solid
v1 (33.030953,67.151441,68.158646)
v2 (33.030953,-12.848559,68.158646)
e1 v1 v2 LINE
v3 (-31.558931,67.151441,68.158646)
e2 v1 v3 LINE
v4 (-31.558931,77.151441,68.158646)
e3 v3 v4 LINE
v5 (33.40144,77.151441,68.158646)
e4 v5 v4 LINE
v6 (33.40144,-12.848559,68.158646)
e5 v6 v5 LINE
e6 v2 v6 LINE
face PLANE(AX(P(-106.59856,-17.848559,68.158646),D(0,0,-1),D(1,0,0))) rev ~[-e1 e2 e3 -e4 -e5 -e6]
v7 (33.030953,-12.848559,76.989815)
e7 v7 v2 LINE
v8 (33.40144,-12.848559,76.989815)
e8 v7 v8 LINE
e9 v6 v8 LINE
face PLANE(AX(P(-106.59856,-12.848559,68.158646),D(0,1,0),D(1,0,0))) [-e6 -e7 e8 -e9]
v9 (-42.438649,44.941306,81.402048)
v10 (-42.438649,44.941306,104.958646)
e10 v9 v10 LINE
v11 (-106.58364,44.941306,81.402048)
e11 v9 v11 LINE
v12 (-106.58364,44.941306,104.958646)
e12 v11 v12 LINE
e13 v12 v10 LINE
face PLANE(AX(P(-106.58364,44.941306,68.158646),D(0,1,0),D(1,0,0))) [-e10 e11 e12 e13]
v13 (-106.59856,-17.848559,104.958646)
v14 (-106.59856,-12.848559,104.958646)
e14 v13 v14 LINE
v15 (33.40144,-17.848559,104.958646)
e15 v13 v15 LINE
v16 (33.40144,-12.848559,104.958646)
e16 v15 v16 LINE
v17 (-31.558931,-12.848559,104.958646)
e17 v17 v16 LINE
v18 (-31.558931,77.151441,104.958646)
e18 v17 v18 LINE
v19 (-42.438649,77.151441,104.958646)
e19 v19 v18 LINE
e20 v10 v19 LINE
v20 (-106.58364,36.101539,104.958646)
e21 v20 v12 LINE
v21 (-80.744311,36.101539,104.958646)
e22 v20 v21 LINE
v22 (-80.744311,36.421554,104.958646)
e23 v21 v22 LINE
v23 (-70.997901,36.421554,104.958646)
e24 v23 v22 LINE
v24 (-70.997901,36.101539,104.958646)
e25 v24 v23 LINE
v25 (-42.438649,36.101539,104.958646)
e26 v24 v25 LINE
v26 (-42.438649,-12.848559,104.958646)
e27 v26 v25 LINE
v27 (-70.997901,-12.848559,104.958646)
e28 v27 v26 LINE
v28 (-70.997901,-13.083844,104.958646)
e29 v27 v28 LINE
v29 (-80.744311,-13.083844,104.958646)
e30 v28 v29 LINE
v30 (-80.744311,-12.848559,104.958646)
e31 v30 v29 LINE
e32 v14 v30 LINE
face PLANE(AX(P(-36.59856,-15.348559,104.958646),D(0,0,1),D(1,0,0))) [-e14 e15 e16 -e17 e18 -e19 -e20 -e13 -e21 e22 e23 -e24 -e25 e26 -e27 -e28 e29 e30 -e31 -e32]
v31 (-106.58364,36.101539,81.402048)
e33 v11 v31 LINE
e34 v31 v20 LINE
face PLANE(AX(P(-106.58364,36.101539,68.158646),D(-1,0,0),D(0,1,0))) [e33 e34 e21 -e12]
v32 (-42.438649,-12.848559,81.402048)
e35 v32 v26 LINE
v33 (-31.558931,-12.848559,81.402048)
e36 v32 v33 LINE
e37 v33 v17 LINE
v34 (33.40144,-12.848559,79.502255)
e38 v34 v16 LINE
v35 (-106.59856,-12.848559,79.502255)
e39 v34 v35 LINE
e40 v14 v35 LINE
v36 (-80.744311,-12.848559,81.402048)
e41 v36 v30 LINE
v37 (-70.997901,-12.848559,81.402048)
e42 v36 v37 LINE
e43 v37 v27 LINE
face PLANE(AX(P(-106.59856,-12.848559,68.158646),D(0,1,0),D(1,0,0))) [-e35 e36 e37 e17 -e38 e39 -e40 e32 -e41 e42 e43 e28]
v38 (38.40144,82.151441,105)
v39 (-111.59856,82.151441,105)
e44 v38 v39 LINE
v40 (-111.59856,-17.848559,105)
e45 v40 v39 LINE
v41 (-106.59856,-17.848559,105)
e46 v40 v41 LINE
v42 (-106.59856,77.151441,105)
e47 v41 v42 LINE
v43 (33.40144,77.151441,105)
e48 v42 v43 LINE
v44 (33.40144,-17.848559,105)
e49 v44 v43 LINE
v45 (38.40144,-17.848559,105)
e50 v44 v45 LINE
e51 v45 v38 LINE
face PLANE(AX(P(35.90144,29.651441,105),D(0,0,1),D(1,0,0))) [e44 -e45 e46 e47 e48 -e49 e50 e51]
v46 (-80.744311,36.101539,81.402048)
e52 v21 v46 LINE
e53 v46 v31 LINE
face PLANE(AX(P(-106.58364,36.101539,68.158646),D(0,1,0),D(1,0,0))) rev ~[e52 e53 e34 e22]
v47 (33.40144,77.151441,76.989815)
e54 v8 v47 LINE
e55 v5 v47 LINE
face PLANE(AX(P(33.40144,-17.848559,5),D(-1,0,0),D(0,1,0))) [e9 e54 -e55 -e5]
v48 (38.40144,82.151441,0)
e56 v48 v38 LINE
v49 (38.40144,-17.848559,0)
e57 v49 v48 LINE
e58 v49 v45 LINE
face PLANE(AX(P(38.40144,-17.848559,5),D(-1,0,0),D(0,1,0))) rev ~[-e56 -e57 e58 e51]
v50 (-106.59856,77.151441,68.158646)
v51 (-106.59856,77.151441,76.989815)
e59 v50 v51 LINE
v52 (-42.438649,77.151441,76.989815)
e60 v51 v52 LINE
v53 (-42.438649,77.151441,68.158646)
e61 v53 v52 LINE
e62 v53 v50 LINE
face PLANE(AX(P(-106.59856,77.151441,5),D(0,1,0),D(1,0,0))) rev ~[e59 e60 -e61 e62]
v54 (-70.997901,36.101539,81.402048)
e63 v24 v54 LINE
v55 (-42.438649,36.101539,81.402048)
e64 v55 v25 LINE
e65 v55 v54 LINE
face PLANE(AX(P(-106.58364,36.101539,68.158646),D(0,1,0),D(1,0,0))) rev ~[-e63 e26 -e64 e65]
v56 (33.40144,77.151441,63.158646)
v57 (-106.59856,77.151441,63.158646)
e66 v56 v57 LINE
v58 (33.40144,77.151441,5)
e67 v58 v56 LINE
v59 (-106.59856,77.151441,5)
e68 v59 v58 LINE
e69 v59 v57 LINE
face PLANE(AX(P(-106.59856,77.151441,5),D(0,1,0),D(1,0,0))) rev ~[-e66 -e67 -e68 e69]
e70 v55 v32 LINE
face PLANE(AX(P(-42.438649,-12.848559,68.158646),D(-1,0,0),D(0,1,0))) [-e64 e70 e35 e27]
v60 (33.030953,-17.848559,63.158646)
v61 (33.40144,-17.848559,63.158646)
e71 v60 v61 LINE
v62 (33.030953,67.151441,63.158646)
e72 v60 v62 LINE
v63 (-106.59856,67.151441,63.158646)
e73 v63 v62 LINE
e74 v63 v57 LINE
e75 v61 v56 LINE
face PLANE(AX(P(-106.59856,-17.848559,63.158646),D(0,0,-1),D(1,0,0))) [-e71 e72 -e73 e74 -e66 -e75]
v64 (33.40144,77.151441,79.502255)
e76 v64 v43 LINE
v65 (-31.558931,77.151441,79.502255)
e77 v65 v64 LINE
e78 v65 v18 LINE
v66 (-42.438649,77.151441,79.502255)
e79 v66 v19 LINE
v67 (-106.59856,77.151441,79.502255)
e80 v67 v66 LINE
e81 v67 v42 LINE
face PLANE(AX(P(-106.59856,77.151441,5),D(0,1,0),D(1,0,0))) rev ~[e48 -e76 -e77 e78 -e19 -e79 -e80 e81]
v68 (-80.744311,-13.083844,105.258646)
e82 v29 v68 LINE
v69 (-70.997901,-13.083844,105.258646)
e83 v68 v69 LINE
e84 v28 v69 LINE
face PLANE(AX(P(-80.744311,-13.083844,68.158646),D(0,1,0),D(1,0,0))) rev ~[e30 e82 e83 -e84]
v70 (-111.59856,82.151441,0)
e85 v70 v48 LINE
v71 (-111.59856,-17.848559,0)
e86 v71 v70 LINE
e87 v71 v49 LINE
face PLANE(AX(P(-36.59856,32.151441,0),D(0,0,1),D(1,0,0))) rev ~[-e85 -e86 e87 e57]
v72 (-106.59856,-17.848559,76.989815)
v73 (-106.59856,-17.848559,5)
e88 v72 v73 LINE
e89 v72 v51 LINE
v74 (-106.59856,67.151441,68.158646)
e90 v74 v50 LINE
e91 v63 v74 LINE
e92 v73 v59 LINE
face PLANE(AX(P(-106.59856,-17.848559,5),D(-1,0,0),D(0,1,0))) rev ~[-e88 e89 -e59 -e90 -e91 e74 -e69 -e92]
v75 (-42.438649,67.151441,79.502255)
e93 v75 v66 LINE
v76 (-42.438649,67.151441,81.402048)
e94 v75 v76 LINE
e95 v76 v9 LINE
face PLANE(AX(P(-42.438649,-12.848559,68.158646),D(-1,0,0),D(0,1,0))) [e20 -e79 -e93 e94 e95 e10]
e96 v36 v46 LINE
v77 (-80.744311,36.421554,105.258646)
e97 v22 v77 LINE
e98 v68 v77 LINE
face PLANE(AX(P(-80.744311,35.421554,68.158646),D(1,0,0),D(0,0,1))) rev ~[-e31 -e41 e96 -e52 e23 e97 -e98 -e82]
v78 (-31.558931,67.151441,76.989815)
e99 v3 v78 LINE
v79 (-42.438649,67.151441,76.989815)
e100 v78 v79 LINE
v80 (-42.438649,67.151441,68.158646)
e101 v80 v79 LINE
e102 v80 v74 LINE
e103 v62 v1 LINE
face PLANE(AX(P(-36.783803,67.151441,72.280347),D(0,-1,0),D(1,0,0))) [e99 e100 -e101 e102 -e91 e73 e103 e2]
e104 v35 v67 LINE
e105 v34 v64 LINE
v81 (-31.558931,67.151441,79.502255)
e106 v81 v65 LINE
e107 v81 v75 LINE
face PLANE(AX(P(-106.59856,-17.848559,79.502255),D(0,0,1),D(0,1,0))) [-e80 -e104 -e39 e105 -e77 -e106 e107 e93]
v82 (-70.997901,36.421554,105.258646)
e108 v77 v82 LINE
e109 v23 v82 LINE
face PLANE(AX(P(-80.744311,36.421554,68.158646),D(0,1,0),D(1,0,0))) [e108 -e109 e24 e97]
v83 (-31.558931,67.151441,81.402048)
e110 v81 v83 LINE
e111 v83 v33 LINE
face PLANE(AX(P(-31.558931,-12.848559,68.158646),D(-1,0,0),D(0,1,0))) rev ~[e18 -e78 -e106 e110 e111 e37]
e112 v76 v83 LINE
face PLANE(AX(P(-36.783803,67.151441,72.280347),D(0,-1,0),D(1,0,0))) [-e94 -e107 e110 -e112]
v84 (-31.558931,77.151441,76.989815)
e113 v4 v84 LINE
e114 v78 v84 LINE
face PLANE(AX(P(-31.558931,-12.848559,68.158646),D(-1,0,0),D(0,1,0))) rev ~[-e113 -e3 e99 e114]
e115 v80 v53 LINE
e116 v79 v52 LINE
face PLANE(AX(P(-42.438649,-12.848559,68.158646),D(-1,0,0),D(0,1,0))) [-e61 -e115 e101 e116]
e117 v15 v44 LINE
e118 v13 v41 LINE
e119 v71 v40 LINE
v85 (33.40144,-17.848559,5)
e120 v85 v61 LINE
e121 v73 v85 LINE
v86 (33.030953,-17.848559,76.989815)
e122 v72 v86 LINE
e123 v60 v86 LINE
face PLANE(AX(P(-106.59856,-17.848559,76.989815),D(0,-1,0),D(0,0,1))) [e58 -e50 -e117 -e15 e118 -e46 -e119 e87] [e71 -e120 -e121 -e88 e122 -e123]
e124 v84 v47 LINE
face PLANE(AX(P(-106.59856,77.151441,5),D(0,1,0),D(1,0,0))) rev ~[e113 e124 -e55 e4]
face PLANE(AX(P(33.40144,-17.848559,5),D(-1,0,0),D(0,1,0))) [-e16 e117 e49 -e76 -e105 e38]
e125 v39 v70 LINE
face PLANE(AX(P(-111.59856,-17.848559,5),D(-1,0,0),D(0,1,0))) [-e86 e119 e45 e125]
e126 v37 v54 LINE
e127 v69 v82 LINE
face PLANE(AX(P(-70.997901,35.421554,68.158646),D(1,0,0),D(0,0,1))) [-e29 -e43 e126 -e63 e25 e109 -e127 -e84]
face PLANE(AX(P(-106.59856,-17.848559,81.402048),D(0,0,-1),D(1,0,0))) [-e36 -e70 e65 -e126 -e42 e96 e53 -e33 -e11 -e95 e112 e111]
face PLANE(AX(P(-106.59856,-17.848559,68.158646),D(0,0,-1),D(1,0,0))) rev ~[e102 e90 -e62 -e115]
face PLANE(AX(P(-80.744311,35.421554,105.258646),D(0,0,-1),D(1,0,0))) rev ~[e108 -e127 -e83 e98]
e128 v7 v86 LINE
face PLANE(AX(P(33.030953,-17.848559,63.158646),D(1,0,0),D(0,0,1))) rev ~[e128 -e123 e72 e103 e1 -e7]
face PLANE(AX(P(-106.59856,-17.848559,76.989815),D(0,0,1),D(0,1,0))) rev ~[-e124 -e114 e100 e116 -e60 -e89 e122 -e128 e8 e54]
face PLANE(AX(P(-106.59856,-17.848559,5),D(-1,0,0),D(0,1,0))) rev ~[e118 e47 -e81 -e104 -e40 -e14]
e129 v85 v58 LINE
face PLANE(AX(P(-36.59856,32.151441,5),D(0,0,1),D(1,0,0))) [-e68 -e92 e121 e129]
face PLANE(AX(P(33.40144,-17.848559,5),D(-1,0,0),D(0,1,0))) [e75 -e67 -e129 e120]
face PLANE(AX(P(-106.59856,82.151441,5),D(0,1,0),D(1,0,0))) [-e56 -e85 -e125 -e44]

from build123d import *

# Parameters (mm, degrees)
F0_W      = 150
F0_H      = 100
F1_DEPTH  = 5
F2_W      = 5
F2_H      = 100
F3_DEPTH  = 100
F4_W      = 145
F4_H      = 5
F5_DEPTH  = 100
F6_W      = 5
F6_H      = 95
F7_DEPTH  = 100
F8_W      = 140
F8_H      = 5
F9_DEPTH  = 100
F10_W     = 140
F10_H     = 5
F11_DEPTH = 36.8
F12_W     = 10.8797177672
F12_H     = 90
F13_DEPTH = 36.8
F15_W     = 64.1449913383
F15_H     = 8.8397674263
F16_DEPTH = 36.8
F17_W     = 9.7464099526
F17_H     = 48.5053984448
F18_DEPTH = 37.1
F19_DEPTH = 1
F20_W     = 139.6295134723
F20_H     = 18.2434022427
F21_DEPTH = 85
F22_W     = 95
F22_H     = 2.5124400854
F23_DEPTH = 142.2
F25_DEPTH = 3


with BuildPart() as f1:
    # F0 (on Top) → F1 (new body)
    with BuildSketch(Plane.XY):
        with Locations((-36.598560214, 32.1514412761)):
            Rectangle(F0_W, F0_H)
    extrude(amount=F1_DEPTH)

    # F2 (on face) → F3 (join)
    with BuildSketch(Plane.XY.offset(5)):
        with Locations((-109.098560214, 32.1514412761)):
            Rectangle(F2_W, F2_H)
    extrude(amount=F3_DEPTH)

    # F4 (on face) → F5 (join)
    with BuildSketch(Plane.XY.offset(5)):
        with Locations((-34.098560214, 79.6514412761)):
            Rectangle(F4_W, F4_H)
    extrude(amount=F5_DEPTH)

    # F6 (on face) → F7 (join)
    with BuildSketch(Plane.XY.offset(5)):
        with Locations((35.901439786, 29.6514412761)):
            Rectangle(F6_W, F6_H)
    extrude(amount=F7_DEPTH)

    # F8 (on face) → F9 (join)
    with BuildSketch(Plane.XZ.offset(17.8485587239)):
        with Locations((-36.598560214, 65.6586462259)):
            Rectangle(F8_W, F8_H)
    extrude(amount=-F9_DEPTH)

    # F10 (on face) → F11 (join)
    with BuildSketch(Plane.XY.offset(68.1586462259)):
        with Locations((-36.598560214, -15.3485587239)):
            Rectangle(F10_W, F10_H)
    extrude(amount=F11_DEPTH)

    # F12 (on face) → F13 (join)
    with BuildSketch(Plane.XY.offset(68.1586462259)):
        with Locations((-36.9987897575, 32.1514412761)):
            Rectangle(F12_W, F12_H)
    extrude(amount=F13_DEPTH)

    # F15 (on face) → F16 (join)
    with BuildSketch(Plane.XY.offset(68.1586462259)):
        with Locations((-74.5111443102, 40.5214224011)):
            Rectangle(F15_W, F15_H)
    extrude(amount=F16_DEPTH)

    # F17 (on face) → F18 (join)
    with BuildSketch(Plane.XY.offset(68.1586462259)):
        with Locations((-75.8711062372, 11.1688547768)):
            Rectangle(F17_W, F17_H)
    extrude(amount=F18_DEPTH)

    # F19 (add): a face of the model
    f19_faces = [f1.faces().sort_by_distance(p)[0] for p in [
        (-75.8711062372, 35.4215539992, 86.7086462259),
    ]]
    extrude(f19_faces, amount=F19_DEPTH)

    # F20 (on face) → F21 (cut)
    with BuildSketch(Plane.XZ.offset(17.8485587239)):
        with Locations((-36.7838034779, 72.2803473473)):
            Rectangle(F20_W, F20_H)
    extrude(amount=-F21_DEPTH, mode=Mode.SUBTRACT)

    # F22 (on face) → F23 (join)
    with BuildSketch(Plane.YZ.offset(-106.598560214)):
        with Locations((29.6514412761, 78.2460346818)):
            Rectangle(F22_W, F22_H)
    extrude(amount=F23_DEPTH)

    # F24 (on face) → F25 (join)
    with BuildSketch(Plane(origin=(0, 0, 81.4020484686), x_dir=(1, 0, 0), z_dir=(0, 0, -1))):
        Polygon((33.0309532583, 17.8485587239), (-106.598560214, 17.8485587239), (-106.598560214, 12.8485587239), (-80.7443112135, 12.8485587239), (-70.9979012609, 12.8485587239), (-42.4386486411, 12.8485587239), (-31.5589308739, 12.8485587239), (33.0309532583, 12.8485587239), align=None)
    extrude(amount=F25_DEPTH)


solid = f1.part
